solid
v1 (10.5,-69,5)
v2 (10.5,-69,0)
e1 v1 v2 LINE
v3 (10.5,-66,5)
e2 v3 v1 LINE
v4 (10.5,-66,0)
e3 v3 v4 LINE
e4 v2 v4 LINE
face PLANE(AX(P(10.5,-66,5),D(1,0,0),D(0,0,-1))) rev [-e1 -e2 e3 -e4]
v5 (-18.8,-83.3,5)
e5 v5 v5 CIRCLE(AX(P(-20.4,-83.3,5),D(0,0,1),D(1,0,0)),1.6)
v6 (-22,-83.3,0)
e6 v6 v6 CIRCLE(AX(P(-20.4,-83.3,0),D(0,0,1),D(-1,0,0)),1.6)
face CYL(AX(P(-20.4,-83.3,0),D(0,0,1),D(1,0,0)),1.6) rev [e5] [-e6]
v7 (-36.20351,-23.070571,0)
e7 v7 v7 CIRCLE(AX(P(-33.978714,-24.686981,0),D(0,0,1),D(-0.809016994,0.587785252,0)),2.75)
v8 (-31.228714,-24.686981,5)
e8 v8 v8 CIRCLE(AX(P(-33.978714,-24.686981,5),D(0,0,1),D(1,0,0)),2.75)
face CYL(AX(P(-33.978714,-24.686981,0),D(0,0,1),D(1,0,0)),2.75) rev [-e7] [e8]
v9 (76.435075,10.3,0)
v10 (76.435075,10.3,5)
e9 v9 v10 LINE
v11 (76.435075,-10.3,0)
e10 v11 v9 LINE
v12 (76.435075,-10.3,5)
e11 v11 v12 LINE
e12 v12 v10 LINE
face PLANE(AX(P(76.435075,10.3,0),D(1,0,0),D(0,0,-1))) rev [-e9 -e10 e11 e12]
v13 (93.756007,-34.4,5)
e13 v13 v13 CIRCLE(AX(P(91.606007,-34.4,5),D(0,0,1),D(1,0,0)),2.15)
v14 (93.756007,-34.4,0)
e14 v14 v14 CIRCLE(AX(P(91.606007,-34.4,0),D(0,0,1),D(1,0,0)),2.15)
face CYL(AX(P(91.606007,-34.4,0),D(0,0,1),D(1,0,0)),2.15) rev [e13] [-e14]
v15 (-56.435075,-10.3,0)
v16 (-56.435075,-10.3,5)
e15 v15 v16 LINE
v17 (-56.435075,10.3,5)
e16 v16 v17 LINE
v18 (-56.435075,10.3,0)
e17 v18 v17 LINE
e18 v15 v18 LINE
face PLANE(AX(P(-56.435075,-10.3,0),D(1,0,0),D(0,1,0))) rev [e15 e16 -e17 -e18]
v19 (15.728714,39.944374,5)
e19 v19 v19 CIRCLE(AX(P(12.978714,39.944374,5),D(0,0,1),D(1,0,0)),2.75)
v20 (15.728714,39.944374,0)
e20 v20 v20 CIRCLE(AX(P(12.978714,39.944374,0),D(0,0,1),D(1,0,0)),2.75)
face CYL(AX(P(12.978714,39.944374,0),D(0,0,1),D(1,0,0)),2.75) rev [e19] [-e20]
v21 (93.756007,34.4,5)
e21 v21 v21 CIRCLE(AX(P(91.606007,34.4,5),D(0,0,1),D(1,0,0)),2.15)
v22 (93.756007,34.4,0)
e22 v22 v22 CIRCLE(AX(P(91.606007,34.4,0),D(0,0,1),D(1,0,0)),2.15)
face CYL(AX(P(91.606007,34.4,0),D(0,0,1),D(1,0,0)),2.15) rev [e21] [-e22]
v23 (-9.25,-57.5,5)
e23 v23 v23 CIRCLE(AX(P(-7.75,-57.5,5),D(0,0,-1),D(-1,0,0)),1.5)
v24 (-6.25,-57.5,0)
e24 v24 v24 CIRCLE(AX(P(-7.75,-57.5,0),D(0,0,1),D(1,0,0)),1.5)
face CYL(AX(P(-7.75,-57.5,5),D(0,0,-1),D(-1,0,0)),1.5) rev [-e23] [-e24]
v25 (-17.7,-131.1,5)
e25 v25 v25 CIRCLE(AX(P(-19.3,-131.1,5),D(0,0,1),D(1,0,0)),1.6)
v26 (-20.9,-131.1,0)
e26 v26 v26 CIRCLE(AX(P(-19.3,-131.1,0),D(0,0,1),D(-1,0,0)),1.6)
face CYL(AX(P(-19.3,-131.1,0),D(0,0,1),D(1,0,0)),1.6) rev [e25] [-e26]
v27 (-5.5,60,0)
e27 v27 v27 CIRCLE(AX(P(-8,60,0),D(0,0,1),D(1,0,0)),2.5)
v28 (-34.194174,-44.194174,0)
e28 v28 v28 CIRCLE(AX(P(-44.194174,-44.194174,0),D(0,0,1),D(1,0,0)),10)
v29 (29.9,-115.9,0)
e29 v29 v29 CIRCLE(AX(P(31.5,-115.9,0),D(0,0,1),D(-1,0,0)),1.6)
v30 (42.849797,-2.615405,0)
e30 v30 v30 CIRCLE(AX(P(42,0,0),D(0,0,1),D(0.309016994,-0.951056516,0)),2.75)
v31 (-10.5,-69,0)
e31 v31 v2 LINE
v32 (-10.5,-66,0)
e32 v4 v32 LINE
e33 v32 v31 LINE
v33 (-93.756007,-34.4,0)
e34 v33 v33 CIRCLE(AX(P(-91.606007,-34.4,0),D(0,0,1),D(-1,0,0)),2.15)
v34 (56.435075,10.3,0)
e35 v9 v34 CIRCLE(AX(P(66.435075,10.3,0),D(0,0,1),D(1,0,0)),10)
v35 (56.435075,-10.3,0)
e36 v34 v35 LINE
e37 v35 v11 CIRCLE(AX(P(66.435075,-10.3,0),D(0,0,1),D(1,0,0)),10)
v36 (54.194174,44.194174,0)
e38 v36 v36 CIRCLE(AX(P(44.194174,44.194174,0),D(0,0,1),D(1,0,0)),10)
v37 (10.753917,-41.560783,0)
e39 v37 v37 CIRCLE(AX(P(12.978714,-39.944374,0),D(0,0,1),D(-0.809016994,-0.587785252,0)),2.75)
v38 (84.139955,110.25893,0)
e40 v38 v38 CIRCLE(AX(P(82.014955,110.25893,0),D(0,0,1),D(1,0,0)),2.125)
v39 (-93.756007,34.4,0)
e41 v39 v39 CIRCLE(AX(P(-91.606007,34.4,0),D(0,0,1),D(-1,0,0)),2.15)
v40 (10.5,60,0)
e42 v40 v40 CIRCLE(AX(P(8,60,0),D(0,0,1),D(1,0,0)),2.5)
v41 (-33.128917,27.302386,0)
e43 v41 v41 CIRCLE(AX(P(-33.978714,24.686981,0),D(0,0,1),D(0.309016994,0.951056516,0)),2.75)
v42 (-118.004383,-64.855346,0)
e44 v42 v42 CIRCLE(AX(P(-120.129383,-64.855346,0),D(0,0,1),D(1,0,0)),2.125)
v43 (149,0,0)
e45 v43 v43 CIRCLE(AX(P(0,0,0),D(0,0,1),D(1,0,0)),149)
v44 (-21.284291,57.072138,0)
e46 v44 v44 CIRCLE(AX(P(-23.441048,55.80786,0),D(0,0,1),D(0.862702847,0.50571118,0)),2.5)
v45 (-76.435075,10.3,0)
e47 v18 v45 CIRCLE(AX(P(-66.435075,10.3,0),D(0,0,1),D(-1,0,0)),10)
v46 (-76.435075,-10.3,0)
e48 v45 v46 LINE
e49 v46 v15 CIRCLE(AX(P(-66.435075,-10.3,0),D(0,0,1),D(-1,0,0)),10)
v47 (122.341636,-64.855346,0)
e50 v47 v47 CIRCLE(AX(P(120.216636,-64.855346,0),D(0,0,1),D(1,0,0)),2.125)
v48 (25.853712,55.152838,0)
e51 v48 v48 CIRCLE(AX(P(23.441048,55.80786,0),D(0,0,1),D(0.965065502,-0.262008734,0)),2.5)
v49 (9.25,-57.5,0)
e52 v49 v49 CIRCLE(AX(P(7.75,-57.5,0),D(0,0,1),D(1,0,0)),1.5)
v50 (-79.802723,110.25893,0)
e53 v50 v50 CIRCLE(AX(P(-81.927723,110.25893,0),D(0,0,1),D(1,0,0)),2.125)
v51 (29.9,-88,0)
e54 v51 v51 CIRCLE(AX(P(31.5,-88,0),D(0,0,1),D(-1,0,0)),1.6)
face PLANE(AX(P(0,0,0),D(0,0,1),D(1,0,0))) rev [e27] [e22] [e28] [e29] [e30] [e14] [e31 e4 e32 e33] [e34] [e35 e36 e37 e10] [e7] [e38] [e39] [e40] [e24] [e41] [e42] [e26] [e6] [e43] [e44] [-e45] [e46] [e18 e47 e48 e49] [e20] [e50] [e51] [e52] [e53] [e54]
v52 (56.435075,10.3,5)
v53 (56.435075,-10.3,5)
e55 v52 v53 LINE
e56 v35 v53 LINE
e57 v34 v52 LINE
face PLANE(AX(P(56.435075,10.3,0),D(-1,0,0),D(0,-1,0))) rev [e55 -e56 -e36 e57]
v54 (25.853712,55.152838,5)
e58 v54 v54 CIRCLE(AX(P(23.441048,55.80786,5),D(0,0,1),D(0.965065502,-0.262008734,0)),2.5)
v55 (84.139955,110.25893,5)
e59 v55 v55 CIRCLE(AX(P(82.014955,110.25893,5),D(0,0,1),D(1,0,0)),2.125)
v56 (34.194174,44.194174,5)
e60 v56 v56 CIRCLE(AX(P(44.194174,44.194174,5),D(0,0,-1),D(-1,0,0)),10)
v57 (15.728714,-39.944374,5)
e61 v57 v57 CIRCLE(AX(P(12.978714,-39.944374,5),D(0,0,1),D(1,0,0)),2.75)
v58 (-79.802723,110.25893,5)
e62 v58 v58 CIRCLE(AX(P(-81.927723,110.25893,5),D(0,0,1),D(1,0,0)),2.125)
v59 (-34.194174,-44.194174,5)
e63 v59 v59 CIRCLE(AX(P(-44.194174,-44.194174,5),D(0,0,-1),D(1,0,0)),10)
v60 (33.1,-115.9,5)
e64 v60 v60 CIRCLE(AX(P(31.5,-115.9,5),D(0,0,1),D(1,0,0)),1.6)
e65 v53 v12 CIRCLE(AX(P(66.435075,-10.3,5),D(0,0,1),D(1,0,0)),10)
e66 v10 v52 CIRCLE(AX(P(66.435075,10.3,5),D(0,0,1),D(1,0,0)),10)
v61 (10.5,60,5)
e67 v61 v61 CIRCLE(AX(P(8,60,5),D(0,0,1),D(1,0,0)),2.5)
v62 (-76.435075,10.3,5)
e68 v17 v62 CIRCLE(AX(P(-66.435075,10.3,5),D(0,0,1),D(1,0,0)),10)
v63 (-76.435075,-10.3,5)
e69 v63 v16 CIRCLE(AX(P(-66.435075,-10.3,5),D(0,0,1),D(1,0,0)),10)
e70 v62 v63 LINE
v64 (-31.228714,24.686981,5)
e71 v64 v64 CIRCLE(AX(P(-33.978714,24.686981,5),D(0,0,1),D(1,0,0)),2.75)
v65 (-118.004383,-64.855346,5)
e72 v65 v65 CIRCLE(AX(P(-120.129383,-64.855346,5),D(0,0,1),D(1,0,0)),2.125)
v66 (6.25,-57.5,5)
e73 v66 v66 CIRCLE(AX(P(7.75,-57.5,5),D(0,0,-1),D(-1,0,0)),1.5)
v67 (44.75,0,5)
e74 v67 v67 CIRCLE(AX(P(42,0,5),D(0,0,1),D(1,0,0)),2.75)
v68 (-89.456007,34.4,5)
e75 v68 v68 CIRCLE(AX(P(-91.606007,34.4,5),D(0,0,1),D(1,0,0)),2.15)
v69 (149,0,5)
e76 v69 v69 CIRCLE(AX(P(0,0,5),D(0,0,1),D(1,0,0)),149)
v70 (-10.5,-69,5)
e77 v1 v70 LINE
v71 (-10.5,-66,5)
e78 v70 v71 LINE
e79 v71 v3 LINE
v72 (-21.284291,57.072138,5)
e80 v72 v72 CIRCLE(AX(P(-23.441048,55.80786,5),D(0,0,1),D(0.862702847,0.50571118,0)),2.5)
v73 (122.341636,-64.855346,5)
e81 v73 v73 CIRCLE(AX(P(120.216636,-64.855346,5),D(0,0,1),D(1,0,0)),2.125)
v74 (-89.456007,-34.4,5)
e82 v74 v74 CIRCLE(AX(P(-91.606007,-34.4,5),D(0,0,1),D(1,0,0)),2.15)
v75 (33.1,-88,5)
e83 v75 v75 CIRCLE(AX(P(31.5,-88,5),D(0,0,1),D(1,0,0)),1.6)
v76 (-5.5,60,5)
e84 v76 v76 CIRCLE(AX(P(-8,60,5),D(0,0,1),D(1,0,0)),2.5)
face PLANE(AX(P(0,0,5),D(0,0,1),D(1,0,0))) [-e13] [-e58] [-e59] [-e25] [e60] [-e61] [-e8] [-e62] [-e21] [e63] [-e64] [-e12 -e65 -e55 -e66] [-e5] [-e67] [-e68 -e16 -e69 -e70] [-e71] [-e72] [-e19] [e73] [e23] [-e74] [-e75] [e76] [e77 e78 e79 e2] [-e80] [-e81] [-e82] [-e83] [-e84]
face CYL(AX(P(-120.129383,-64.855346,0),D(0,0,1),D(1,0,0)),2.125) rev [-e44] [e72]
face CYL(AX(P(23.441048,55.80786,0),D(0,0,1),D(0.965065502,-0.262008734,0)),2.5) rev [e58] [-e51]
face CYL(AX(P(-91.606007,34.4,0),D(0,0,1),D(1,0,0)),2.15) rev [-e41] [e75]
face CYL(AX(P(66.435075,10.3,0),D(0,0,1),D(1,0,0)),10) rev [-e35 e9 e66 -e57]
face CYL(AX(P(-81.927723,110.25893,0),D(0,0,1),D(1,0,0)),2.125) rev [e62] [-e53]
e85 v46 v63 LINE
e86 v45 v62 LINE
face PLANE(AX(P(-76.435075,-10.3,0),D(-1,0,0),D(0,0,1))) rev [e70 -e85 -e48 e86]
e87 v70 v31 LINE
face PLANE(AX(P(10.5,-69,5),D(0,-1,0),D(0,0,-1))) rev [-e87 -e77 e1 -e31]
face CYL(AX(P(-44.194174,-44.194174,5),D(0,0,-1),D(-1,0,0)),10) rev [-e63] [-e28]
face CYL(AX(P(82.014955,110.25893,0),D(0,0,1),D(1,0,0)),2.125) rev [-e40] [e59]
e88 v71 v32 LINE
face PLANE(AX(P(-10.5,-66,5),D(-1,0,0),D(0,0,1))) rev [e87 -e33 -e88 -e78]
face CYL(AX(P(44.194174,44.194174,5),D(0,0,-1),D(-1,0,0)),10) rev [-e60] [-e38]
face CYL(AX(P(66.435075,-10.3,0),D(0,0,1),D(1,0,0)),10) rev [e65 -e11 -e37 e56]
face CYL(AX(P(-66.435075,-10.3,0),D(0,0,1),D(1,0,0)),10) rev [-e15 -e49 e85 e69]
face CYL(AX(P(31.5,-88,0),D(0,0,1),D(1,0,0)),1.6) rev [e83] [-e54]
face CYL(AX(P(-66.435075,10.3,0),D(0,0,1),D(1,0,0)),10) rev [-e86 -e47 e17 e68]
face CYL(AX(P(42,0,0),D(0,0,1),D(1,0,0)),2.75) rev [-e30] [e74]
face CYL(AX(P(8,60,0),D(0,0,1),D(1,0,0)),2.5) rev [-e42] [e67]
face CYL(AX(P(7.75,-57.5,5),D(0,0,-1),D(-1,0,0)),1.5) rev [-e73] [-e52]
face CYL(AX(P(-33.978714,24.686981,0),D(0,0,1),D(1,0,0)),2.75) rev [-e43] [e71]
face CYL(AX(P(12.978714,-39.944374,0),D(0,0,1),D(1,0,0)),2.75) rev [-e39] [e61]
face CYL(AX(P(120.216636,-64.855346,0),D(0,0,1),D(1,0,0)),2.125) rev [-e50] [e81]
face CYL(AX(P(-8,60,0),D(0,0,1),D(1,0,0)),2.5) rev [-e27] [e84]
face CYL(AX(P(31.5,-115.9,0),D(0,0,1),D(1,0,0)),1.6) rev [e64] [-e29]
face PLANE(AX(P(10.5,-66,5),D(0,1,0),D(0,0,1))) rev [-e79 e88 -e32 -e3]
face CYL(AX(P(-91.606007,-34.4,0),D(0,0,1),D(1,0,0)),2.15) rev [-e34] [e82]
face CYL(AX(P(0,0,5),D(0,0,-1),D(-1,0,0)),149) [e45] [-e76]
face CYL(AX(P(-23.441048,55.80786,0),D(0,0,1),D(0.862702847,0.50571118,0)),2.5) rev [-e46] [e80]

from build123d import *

# Parameters (mm, degrees)
SKETCH1_R                        = 149
PLATE_DEPTH                      = 5
SKETCH3_R                        = 2.75
TABLELEGHOLE_DEPTH               = 211.777133485
TABLELEGPATTERN_COUNT            = 5
SKETCH5_R                        = 2.15
LIDARHOLESMOUNTING_DEPTH         = 211.777133485
LIDARHOLEPOWER_DEPTH             = 211.777133485
SKETCH22_R                       = 10
CUT_EXTRUDE12_DEPTH              = 211.777133485
MULTIPLELIDARS_OUTLINE_R         = 2.15
MULTIPLELIDARS_OUTLINE_R_2       = 10
MULTIPLELIDARS_DEPTH             = 5
CUT_EXTRUDE8_DEPTH               = 211.777133485
CUT_EXTRUDE8_DEPTH_BACK          = 211.777133485
SKETCH16_R                       = 2.125
SKETCH19_R                       = 2.5
CUT_EXTRUDE9_DEPTH               = 211.777133485
CIRPATTERN19_COUNT               = 2
CIRPATTERN19_ANGLE               = 15.189286737
CIRPATTERN19_THE_OTHER_WAY_COUNT = 2
CIRPATTERN19_THE_OTHER_WAY_ANGLE = 15.189286737
CUT_EXTRUDE10_DEPTH              = 211.777133485
CUT_EXTRUDE10_DEPTH_BACK         = 211.777133485
SKETCH21_R                       = 1.5
SKETCH21_W                       = 21
SKETCH21_H                       = 3
CUT_EXTRUDE13_DEPTH              = 211.777133485
CUT_EXTRUDE13_DEPTH_BACK         = 211.777133485
SKETCH23_R                       = 1.6


# Read off the part's stored shape, not the designer's step: MultipleLIDARs
with BuildPart() as part:
    # Sketch1 → Plate (new body)
    with BuildSketch(Plane.XY):
        Circle(SKETCH1_R)
    extrude(amount=PLATE_DEPTH)

    # Sketch3 → TableLegHole (cut, symmetric)
    with BuildSketch(Plane.XY.offset(5)):
        with Locations((12.978713764, 39.944373684)):
            Circle(SKETCH3_R)
    tableleghole = extrude(amount=TABLELEGHOLE_DEPTH, both=True, mode=Mode.SUBTRACT)

    # TableLegPattern: TableLegHole ×5 about axis
    tablelegpattern_axis = Axis((0, 0, 0), (0, 0, 1))
    for i in range(1, TABLELEGPATTERN_COUNT):
        add(tableleghole.rotate(tablelegpattern_axis, i * 360 / TABLELEGPATTERN_COUNT), mode=Mode.SUBTRACT)

    # Sketch5 → LIDARHolesMounting (cut, symmetric)
    with BuildSketch(Plane.XY.offset(5)):
        with Locations((91.60600659, 34.399999999)):
            Circle(SKETCH5_R)
        with Locations((91.60600659, -34.400000001)):
            Circle(SKETCH5_R)
    extrude(amount=LIDARHOLESMOUNTING_DEPTH, both=True, mode=Mode.SUBTRACT)

    # Sketch6 → LIDARHolePower (cut, symmetric)
    with BuildSketch(Plane.XY.offset(5)):
        with BuildLine():
            Line((76.435075359, 10.29999973), (76.435075359, -10.30000027))
            ThreePointArc((76.435075359, -10.30000027), (66.435075327, -20.300000238), (56.435075359, -10.30000027))
            Line((56.435075359, -10.30000027), (56.435075359, 10.29999973))
            ThreePointArc((56.435075359, 10.29999973), (66.435075359, 20.29999973), (76.435075359, 10.29999973))
        make_face()
    extrude(amount=LIDARHOLEPOWER_DEPTH, both=True, mode=Mode.SUBTRACT)

    # Sketch22 → Cut-Extrude12 (cut, symmetric)
    with BuildSketch(Plane(origin=(0, 0, 0), x_dir=(-1, 0, 0), z_dir=(0, 0, -1))):
        with Locations((-44.194173824, 44.194173824)):
            Circle(SKETCH22_R)
    extrude(amount=CUT_EXTRUDE12_DEPTH, both=True, mode=Mode.SUBTRACT)

    # MultipleLIDARs outline → MultipleLIDARs (cut)
    with BuildSketch(Plane.XY):
        with Locations((-91.60600659, -34.399999999)):
            Circle(MULTIPLELIDARS_OUTLINE_R)
        with Locations((-91.60600659, 34.400000001)):
            Circle(MULTIPLELIDARS_OUTLINE_R)
        with BuildLine():
            Line((-76.435075327, 10.30000027), (-76.435075359, -10.29999973))
            ThreePointArc((-76.435075359, -10.29999973), (-66.435075359, -20.29999973), (-56.435075359, -10.29999973))
            Line((-56.435075359, -10.29999973), (-56.435075327, 10.30000027))
            ThreePointArc((-56.435075327, 10.30000027), (-66.435075327, 20.30000027), (-76.435075327, 10.30000027))
        make_face()
        with Locations((-44.194173824, -44.194173824)):
            Circle(MULTIPLELIDARS_OUTLINE_R_2)
    extrude(amount=MULTIPLELIDARS_DEPTH, mode=Mode.SUBTRACT)

    # Sketch16 → Cut-Extrude8 (cut, two sides: drawn at the far end of the back side and taken through both)
    with BuildSketch(Plane.XY.offset(5).offset(-CUT_EXTRUDE8_DEPTH_BACK)):
        with Locations((120.216636108, -64.855346008)):
            Circle(SKETCH16_R)
        with Locations((-120.129383426, -64.855346008)):
            Circle(SKETCH16_R)
        with Locations((-81.927723162, 110.258930177)):
            Circle(SKETCH16_R)
        with Locations((82.014955409, 110.258930177)):
            Circle(SKETCH16_R)
    extrude(amount=CUT_EXTRUDE8_DEPTH + CUT_EXTRUDE8_DEPTH_BACK, mode=Mode.SUBTRACT)

    # Sketch19 → Cut-Extrude9 (cut, symmetric)
    with BuildSketch(Plane.XY.offset(5)):
        with Locations((8, 60)):
            Circle(SKETCH19_R)
        with Locations((-8, 60)):
            Circle(SKETCH19_R)
    cut_extrude9 = extrude(amount=CUT_EXTRUDE9_DEPTH, both=True, mode=Mode.SUBTRACT)

    # CirPattern19: Cut-Extrude9 ×2 about axis
    cirpattern19_axis = Axis((0, 0, 0), (0, 0, -1))
    for i in range(1, CIRPATTERN19_COUNT):
        add(cut_extrude9.rotate(cirpattern19_axis, i * CIRPATTERN19_ANGLE / (CIRPATTERN19_COUNT - 1)), mode=Mode.SUBTRACT)

    # CirPattern19 the other way: Cut-Extrude9 ×2 about axis
    cirpattern19_the_other_way_axis = Axis((0, 0, 0), (0, 0, 1))
    for i in range(1, CIRPATTERN19_THE_OTHER_WAY_COUNT):
        add(cut_extrude9.rotate(cirpattern19_the_other_way_axis, i * CIRPATTERN19_THE_OTHER_WAY_ANGLE / (CIRPATTERN19_THE_OTHER_WAY_COUNT - 1)), mode=Mode.SUBTRACT)

    # Sketch21 → Cut-Extrude10 (cut, two sides: drawn at the far end of the back side and taken through both)
    with BuildSketch(Plane(origin=(0, 0, 0), x_dir=(-1, 0, 0), z_dir=(0, 0, -1)).offset(-CUT_EXTRUDE10_DEPTH_BACK)):
        with Locations((7.75, -57.5)):
            Circle(SKETCH21_R)
        with Locations((-7.75, -57.5)):
            Circle(SKETCH21_R)
        with Locations((0, -67.5)):
            Rectangle(SKETCH21_W, SKETCH21_H)
    extrude(amount=CUT_EXTRUDE10_DEPTH + CUT_EXTRUDE10_DEPTH_BACK, mode=Mode.SUBTRACT)

    # Sketch23 → Cut-Extrude13 (cut, two sides: drawn at the far end of the back side and taken through both)
    with BuildSketch(Plane.XY.offset(5).offset(-CUT_EXTRUDE13_DEPTH_BACK)):
        with Locations((-20.4, -83.3)):
            Circle(SKETCH23_R)
        with Locations((31.5, -88)):
            Circle(SKETCH23_R)
        with Locations((31.5, -115.9)):
            Circle(SKETCH23_R)
        with Locations((-19.3, -131.1)):
            Circle(SKETCH23_R)
    extrude(amount=CUT_EXTRUDE13_DEPTH + CUT_EXTRUDE13_DEPTH_BACK, mode=Mode.SUBTRACT)


solid = part.part
